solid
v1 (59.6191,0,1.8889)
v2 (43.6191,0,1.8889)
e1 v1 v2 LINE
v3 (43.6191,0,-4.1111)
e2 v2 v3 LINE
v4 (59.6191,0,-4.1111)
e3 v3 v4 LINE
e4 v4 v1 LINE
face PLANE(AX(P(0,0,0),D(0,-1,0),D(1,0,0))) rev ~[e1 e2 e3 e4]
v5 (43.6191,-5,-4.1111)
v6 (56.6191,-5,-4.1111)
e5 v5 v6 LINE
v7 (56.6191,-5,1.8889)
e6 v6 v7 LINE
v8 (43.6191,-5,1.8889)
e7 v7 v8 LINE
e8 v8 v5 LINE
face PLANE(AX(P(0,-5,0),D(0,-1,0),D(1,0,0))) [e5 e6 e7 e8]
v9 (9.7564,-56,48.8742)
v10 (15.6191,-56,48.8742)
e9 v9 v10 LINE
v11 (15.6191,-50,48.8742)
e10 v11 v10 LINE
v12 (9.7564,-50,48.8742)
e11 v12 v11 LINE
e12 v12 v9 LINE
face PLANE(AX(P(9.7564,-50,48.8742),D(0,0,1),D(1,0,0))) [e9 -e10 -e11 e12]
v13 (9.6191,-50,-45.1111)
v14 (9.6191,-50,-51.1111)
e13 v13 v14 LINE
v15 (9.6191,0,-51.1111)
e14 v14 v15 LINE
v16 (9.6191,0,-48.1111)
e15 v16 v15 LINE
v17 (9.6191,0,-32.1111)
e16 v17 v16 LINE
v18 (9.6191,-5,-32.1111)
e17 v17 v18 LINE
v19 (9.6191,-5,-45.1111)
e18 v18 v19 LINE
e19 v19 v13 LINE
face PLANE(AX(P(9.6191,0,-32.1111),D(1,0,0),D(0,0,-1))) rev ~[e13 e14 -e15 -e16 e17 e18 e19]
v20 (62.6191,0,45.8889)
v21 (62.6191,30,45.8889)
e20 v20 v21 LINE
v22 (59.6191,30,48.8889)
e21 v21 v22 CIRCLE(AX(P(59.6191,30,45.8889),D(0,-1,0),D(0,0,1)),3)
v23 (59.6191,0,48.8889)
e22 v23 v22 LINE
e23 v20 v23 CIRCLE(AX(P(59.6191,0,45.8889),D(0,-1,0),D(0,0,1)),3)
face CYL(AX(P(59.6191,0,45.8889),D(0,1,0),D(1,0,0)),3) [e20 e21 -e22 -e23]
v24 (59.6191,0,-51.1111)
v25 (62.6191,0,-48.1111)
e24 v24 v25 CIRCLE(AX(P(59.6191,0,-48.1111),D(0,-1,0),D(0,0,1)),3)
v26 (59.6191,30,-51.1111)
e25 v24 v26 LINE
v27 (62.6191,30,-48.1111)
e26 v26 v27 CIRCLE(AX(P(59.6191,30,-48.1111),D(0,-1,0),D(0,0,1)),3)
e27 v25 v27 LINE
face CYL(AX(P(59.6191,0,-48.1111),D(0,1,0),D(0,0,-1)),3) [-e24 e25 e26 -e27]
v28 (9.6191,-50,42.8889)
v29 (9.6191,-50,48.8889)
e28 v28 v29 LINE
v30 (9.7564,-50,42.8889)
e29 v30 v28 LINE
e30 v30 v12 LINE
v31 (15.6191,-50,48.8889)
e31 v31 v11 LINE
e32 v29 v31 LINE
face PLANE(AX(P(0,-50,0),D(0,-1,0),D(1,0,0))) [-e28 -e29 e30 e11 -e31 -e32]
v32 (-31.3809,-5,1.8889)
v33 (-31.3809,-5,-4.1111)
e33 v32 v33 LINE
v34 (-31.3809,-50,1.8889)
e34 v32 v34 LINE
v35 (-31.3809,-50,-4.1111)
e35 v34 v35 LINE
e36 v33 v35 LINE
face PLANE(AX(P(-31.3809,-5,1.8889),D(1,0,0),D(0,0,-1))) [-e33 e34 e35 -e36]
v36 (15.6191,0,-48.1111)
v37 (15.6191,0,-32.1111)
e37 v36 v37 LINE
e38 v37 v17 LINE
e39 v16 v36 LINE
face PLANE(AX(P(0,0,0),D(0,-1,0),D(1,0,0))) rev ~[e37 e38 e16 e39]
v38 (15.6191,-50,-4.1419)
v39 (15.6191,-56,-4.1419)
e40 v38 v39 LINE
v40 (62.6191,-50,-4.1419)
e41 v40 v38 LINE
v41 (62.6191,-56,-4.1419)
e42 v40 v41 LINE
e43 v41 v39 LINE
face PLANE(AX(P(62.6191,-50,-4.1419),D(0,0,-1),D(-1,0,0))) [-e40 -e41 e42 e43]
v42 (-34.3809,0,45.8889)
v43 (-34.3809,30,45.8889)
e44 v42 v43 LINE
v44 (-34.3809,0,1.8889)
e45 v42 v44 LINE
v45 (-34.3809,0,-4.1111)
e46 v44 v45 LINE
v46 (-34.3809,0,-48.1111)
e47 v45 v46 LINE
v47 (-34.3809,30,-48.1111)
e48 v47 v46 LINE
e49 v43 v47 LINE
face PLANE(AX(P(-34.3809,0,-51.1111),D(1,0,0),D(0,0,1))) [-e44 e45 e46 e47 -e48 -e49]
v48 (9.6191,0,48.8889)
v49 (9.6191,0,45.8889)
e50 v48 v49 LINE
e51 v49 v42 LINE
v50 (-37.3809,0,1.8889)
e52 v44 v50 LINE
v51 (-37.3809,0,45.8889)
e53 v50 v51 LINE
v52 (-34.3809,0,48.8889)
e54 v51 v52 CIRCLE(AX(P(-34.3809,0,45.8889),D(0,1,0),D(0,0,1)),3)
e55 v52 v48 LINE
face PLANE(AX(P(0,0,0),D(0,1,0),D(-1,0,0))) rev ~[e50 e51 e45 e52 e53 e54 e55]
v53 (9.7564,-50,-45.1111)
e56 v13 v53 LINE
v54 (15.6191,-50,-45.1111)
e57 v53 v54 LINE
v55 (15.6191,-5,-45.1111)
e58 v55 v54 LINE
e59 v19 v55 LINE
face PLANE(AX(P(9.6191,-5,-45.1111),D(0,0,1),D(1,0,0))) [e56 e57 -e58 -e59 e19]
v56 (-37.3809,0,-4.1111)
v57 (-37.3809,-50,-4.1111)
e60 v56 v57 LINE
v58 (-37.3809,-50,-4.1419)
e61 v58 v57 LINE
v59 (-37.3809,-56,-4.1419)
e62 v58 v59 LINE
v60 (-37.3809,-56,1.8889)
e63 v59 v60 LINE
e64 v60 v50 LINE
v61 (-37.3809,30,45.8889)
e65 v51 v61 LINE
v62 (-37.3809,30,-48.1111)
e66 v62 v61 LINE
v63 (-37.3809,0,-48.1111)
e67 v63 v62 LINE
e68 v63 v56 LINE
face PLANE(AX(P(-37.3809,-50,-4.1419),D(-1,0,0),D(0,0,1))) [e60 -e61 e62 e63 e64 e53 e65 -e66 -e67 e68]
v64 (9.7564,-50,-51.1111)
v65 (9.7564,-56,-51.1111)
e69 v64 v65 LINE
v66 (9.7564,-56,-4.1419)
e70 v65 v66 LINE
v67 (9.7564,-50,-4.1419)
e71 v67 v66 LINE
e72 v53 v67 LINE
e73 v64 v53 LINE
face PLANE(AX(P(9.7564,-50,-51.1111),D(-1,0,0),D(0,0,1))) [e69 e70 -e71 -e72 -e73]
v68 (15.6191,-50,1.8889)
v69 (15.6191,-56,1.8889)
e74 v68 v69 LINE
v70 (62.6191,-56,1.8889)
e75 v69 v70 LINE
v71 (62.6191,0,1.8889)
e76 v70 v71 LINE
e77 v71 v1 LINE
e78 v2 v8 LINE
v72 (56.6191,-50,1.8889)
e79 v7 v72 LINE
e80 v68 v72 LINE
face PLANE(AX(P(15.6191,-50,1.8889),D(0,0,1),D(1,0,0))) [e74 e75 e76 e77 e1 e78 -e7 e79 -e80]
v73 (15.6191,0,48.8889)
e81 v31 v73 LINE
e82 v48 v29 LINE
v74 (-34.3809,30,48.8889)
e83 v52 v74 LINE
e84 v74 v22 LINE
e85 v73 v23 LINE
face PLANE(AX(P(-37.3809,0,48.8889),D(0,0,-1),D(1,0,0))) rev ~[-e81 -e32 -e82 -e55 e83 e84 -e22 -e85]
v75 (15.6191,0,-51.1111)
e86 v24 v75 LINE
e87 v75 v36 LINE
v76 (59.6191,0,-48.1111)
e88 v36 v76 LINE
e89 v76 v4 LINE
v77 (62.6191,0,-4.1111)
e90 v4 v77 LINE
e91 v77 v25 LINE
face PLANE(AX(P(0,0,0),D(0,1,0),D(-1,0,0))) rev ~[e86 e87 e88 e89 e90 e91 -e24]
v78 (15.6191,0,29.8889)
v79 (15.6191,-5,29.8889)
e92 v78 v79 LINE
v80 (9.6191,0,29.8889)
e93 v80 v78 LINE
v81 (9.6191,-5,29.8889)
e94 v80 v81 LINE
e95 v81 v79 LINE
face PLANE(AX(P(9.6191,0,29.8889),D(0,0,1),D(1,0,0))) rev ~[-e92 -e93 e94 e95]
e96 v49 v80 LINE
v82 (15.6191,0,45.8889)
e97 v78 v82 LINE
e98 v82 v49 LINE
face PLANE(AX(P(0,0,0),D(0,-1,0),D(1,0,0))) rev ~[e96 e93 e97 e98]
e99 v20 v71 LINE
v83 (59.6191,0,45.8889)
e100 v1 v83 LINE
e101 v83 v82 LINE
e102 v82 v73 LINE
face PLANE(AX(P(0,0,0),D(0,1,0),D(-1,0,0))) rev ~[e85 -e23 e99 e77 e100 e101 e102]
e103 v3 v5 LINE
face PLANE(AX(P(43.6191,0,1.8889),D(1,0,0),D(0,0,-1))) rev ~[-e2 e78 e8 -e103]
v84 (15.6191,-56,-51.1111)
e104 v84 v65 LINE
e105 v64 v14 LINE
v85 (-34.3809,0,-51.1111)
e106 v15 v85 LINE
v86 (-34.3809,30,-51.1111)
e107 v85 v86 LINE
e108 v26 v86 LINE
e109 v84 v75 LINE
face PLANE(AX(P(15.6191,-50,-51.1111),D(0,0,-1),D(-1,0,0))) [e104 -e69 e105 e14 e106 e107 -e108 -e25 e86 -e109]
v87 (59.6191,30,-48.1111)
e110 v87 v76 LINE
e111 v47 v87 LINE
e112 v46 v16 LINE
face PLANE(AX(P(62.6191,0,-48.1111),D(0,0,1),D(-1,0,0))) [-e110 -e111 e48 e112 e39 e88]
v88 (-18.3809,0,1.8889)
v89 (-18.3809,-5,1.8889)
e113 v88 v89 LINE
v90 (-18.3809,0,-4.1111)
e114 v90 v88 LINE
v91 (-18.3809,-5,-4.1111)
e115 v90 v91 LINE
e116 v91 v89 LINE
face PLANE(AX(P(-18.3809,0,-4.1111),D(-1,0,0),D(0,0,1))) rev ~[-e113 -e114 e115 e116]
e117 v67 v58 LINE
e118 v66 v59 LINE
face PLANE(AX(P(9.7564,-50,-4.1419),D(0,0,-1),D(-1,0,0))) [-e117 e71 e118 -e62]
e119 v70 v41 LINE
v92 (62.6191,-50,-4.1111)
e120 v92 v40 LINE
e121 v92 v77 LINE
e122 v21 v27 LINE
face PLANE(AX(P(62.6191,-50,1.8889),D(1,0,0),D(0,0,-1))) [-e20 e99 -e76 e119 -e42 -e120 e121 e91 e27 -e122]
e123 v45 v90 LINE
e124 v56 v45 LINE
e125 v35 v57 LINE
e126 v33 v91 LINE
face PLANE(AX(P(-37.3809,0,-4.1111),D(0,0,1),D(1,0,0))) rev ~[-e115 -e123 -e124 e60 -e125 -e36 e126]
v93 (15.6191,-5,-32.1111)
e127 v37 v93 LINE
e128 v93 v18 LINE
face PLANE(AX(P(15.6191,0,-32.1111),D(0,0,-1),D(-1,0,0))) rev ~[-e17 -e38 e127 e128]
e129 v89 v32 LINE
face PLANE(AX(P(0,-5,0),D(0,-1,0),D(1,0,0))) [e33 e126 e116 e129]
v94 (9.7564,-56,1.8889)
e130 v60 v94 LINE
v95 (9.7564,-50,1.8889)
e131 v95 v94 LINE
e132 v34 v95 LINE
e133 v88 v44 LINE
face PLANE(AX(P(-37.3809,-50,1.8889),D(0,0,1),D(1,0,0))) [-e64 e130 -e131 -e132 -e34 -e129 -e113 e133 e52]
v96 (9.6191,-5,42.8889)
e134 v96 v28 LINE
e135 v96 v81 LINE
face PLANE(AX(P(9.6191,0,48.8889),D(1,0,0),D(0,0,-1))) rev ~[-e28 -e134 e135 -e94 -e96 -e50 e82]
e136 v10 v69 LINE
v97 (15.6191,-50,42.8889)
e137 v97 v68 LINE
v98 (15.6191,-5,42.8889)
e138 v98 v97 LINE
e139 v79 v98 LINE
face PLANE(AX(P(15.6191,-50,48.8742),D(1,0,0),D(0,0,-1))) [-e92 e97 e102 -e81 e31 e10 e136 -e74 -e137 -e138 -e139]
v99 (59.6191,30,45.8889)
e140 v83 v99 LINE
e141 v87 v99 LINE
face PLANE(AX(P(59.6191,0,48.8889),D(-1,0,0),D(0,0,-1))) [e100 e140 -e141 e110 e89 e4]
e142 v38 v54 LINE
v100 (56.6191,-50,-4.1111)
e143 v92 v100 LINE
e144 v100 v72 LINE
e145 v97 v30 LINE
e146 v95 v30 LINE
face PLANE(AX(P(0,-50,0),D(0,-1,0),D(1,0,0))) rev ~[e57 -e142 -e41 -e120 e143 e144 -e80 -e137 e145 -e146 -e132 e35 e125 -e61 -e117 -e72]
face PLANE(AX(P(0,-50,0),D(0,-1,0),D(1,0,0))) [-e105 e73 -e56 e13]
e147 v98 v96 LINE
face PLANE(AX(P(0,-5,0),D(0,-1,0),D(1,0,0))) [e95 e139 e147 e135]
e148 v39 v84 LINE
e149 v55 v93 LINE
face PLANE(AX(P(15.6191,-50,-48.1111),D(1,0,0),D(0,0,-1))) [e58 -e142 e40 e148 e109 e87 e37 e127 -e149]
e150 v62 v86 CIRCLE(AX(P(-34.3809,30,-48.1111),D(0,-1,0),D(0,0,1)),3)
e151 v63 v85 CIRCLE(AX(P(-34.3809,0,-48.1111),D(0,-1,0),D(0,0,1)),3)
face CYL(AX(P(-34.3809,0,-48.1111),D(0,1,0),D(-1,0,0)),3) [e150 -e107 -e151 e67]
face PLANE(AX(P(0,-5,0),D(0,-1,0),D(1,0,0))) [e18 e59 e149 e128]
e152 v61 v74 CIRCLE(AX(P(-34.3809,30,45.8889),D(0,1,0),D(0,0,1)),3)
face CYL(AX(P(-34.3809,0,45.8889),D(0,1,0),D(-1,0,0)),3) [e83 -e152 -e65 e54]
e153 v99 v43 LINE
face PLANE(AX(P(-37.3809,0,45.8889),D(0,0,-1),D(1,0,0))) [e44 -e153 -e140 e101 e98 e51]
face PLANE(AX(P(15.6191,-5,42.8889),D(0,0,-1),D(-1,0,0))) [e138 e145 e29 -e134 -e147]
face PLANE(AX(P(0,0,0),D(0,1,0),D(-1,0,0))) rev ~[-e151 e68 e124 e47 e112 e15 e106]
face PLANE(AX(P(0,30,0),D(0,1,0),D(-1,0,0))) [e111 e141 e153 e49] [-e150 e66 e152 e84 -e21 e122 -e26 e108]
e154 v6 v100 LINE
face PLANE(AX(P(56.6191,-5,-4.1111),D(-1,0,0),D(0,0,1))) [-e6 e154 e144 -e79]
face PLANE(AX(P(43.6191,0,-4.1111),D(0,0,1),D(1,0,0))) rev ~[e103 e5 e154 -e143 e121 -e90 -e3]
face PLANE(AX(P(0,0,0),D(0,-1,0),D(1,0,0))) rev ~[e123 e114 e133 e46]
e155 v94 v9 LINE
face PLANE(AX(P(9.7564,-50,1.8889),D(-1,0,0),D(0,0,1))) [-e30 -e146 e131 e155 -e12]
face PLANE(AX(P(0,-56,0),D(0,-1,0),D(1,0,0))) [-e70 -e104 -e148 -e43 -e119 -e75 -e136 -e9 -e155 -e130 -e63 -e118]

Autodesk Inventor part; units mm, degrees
ref_plane "YZ Plane" through (0, 0, 0) normal (1, 0, 0) x (0, 1, 0)
ref_plane "XZ Plane" through (0, 0, 0) normal (0, 1, 0) x (-1, 0, 0)
ref_plane "XY Plane" through (0, 0, 0) normal (0, 0, 1) x (1, 0, 0)
sketch "Sketch1" plane through (0, 0, 0) normal (0, 1, 0) x (-1, 0, 0)
  line L0 (37.3809, 48.8889) -> (-62.6191, 48.8889)
  line L1 (-62.6191, 48.8889) -> (-62.6191, -51.1111)
  line L2 (-62.6191, -51.1111) -> (37.3809, -51.1111)
  line L3 (37.3809, -51.1111) -> (37.3809, 48.8889)
  point P0 (0, 0)
  dimension "d0" = 100
  dimension "d1" = 100
extrude "Extrusion1" add sketch "Sketch1" along normal blind 30
fillet "Fillet1" radius 3 4 edges at (-37.3809, 15, -51.1111) (-37.3809, 15, 48.8889) (62.6191, 15, -51.1111) (62.6191, 15, 48.8889)
shell "Shell1" thickness 3 removed faces 2 at (27.2857, 30, 14.5556) at (27.2857, 0, 14.5556)
sketch "Sketch2" plane through (0, 0, 0) normal (0, -1, 0) x (1, 0, 0)
  line L0 (-34.3809, 48.8889) -> (59.6191, 48.8889) projected
  line L1 (15.6191, 48.8889) -> (9.6191, 48.8889)
  line L2 (9.6191, 48.8889) -> (9.6191, 29.8889)
  line L3 (9.6191, 29.8889) -> (15.6191, 29.8889)
  line L4 (15.6191, 29.8889) -> (15.6191, 48.8889)
  line L5 (62.6191, 45.8889) -> (62.6191, -48.1111) projected
  line L6 (62.6191, 1.8889) -> (43.6191, 1.8889)
  line L7 (43.6191, 1.8889) -> (43.6191, -4.1111)
  line L8 (43.6191, -4.1111) -> (62.6191, -4.1111)
  line L9 (62.6191, -4.1111) -> (62.6191, 1.8889)
  line L10 (59.6191, -51.1111) -> (-34.3809, -51.1111) projected
  line L11 (15.6191, -32.1111) -> (9.6191, -32.1111)
  line L12 (9.6191, -32.1111) -> (9.6191, -51.1111)
  line L13 (9.6191, -51.1111) -> (15.6191, -51.1111)
  line L14 (15.6191, -51.1111) -> (15.6191, -32.1111)
  line L15 (-37.3809, -48.1111) -> (-37.3809, 45.8889) projected
  line L16 (-18.3809, 1.8889) -> (-37.3809, 1.8889)
  line L17 (-37.3809, 1.8889) -> (-37.3809, -4.1111)
  line L18 (-37.3809, -4.1111) -> (-18.3809, -4.1111)
  line L19 (-18.3809, -4.1111) -> (-18.3809, 1.8889)
  point P0 (0, 0)
  dimension "d6" = 6
  dimension "d7" = 47
  dimension "d8" = 19
  dimension "d9" = 6
  dimension "d10" = 19
  dimension "d11" = 47
  dimension "d12" = 6
  dimension "d13" = 19
  dimension "d14" = 47
  dimension "d15" = 6
  dimension "d16" = 19
  dimension "d17" = 47
extrude "Extrusion2" add sketch "Sketch2" along normal blind 5
sketch "Sketch3" plane through (0, -5, 0) normal (0, -1, 0) x (1, 0, 0)
  line L0 (-34.3809, 48.8889) -> (9.6191, 48.8889) projected
  line L1 (15.6191, 29.8889) -> (15.6191, 45.8889) projected
  line L2 (9.6191, 48.8889) -> (15.6191, 48.8889)
  line L3 (15.6191, 48.8889) -> (15.6191, 42.8889)
  line L4 (15.6191, 42.8889) -> (9.6191, 42.8889)
  line L5 (9.6191, 42.8889) -> (9.6191, 48.8889)
  line L6 (-18.3809, 1.8889) -> (-37.3809, 1.8889) projected
  line L7 (-34.3809, -4.1111) -> (-18.3809, -4.1111) projected
  line L8 (-37.3809, 1.8889) -> (-31.3809, 1.8889)
  line L9 (-31.3809, 1.8889) -> (-31.3809, -4.1111)
  line L10 (-31.3809, -4.1111) -> (-37.3809, -4.1111)
  line L11 (-37.3809, -4.1111) -> (-37.3809, 1.8889)
  line L12 (9.6191, -32.1111) -> (9.6191, -51.1111) projected
  line L13 (9.6191, -45.1111) -> (15.6191, -45.1111)
  line L14 (15.6191, -45.1111) -> (15.6191, -51.1111)
  line L15 (15.6191, -51.1111) -> (9.6191, -51.1111)
  line L16 (9.6191, -51.1111) -> (9.6191, -45.1111)
  line L17 (59.6191, 1.8889) -> (43.6191, 1.8889) projected
  line L18 (62.6191, 45.8889) -> (62.6191, -48.1111) projected
  line L19 (56.6191, 1.8889) -> (62.6191, 1.8889)
  line L20 (62.6191, 1.8889) -> (62.6191, -4.1111)
  line L21 (62.6191, -4.1111) -> (56.6191, -4.1111)
  line L22 (56.6191, -4.1111) -> (56.6191, 1.8889)
  point P0 (0, 0)
  dimension "d20" = 6
  dimension "d21" = 6
  dimension "d22" = 6
  dimension "d23" = 6
  dimension "d24" = 6
extrude "Extrusion3" add sketch "Sketch3" along normal blind 45
sketch "Sketch4" plane through (0, -50, 0) normal (0, -1, 0) x (1, 0, 0)
  line L0 (15.6191, -48.1111) -> (15.6191, -51.1111) projected
  line L1 (9.7564, 48.8742) -> (15.6191, 48.8742)
  line L2 (15.6191, -51.1111) -> (9.7564, -51.1111)
  line L3 (-37.3809, 1.8889) -> (-37.3809, 45.8889) projected
  line L4 (62.6191, 45.8889) -> (62.6191, -48.1111) projected
  line L5 (62.6191, 1.8889) -> (62.6191, -4.1419)
  line L6 (-37.3809, -4.1419) -> (-37.3809, 1.8889)
  line L7 (-37.3809, 1.8889) -> (9.7564, 1.8889)
  line L8 (15.6191, 1.8889) -> (62.6191, 1.8889)
  line L9 (9.7564, -51.1111) -> (9.7564, -4.1419)
  line L10 (9.7564, 1.8889) -> (9.7564, 48.8742)
  line L11 (62.6191, -4.1419) -> (15.6191, -4.1419)
  line L12 (9.7564, -4.1419) -> (-37.3809, -4.1419)
  line L13 (15.6191, 48.8742) -> (15.6191, 1.8889)
  line L14 (15.6191, -4.1419) -> (15.6191, -51.1111)
  point P0 (0, 0)
extrude "Extrusion4" add sketch "Sketch4" along normal blind 6
properties part number "bottom"
